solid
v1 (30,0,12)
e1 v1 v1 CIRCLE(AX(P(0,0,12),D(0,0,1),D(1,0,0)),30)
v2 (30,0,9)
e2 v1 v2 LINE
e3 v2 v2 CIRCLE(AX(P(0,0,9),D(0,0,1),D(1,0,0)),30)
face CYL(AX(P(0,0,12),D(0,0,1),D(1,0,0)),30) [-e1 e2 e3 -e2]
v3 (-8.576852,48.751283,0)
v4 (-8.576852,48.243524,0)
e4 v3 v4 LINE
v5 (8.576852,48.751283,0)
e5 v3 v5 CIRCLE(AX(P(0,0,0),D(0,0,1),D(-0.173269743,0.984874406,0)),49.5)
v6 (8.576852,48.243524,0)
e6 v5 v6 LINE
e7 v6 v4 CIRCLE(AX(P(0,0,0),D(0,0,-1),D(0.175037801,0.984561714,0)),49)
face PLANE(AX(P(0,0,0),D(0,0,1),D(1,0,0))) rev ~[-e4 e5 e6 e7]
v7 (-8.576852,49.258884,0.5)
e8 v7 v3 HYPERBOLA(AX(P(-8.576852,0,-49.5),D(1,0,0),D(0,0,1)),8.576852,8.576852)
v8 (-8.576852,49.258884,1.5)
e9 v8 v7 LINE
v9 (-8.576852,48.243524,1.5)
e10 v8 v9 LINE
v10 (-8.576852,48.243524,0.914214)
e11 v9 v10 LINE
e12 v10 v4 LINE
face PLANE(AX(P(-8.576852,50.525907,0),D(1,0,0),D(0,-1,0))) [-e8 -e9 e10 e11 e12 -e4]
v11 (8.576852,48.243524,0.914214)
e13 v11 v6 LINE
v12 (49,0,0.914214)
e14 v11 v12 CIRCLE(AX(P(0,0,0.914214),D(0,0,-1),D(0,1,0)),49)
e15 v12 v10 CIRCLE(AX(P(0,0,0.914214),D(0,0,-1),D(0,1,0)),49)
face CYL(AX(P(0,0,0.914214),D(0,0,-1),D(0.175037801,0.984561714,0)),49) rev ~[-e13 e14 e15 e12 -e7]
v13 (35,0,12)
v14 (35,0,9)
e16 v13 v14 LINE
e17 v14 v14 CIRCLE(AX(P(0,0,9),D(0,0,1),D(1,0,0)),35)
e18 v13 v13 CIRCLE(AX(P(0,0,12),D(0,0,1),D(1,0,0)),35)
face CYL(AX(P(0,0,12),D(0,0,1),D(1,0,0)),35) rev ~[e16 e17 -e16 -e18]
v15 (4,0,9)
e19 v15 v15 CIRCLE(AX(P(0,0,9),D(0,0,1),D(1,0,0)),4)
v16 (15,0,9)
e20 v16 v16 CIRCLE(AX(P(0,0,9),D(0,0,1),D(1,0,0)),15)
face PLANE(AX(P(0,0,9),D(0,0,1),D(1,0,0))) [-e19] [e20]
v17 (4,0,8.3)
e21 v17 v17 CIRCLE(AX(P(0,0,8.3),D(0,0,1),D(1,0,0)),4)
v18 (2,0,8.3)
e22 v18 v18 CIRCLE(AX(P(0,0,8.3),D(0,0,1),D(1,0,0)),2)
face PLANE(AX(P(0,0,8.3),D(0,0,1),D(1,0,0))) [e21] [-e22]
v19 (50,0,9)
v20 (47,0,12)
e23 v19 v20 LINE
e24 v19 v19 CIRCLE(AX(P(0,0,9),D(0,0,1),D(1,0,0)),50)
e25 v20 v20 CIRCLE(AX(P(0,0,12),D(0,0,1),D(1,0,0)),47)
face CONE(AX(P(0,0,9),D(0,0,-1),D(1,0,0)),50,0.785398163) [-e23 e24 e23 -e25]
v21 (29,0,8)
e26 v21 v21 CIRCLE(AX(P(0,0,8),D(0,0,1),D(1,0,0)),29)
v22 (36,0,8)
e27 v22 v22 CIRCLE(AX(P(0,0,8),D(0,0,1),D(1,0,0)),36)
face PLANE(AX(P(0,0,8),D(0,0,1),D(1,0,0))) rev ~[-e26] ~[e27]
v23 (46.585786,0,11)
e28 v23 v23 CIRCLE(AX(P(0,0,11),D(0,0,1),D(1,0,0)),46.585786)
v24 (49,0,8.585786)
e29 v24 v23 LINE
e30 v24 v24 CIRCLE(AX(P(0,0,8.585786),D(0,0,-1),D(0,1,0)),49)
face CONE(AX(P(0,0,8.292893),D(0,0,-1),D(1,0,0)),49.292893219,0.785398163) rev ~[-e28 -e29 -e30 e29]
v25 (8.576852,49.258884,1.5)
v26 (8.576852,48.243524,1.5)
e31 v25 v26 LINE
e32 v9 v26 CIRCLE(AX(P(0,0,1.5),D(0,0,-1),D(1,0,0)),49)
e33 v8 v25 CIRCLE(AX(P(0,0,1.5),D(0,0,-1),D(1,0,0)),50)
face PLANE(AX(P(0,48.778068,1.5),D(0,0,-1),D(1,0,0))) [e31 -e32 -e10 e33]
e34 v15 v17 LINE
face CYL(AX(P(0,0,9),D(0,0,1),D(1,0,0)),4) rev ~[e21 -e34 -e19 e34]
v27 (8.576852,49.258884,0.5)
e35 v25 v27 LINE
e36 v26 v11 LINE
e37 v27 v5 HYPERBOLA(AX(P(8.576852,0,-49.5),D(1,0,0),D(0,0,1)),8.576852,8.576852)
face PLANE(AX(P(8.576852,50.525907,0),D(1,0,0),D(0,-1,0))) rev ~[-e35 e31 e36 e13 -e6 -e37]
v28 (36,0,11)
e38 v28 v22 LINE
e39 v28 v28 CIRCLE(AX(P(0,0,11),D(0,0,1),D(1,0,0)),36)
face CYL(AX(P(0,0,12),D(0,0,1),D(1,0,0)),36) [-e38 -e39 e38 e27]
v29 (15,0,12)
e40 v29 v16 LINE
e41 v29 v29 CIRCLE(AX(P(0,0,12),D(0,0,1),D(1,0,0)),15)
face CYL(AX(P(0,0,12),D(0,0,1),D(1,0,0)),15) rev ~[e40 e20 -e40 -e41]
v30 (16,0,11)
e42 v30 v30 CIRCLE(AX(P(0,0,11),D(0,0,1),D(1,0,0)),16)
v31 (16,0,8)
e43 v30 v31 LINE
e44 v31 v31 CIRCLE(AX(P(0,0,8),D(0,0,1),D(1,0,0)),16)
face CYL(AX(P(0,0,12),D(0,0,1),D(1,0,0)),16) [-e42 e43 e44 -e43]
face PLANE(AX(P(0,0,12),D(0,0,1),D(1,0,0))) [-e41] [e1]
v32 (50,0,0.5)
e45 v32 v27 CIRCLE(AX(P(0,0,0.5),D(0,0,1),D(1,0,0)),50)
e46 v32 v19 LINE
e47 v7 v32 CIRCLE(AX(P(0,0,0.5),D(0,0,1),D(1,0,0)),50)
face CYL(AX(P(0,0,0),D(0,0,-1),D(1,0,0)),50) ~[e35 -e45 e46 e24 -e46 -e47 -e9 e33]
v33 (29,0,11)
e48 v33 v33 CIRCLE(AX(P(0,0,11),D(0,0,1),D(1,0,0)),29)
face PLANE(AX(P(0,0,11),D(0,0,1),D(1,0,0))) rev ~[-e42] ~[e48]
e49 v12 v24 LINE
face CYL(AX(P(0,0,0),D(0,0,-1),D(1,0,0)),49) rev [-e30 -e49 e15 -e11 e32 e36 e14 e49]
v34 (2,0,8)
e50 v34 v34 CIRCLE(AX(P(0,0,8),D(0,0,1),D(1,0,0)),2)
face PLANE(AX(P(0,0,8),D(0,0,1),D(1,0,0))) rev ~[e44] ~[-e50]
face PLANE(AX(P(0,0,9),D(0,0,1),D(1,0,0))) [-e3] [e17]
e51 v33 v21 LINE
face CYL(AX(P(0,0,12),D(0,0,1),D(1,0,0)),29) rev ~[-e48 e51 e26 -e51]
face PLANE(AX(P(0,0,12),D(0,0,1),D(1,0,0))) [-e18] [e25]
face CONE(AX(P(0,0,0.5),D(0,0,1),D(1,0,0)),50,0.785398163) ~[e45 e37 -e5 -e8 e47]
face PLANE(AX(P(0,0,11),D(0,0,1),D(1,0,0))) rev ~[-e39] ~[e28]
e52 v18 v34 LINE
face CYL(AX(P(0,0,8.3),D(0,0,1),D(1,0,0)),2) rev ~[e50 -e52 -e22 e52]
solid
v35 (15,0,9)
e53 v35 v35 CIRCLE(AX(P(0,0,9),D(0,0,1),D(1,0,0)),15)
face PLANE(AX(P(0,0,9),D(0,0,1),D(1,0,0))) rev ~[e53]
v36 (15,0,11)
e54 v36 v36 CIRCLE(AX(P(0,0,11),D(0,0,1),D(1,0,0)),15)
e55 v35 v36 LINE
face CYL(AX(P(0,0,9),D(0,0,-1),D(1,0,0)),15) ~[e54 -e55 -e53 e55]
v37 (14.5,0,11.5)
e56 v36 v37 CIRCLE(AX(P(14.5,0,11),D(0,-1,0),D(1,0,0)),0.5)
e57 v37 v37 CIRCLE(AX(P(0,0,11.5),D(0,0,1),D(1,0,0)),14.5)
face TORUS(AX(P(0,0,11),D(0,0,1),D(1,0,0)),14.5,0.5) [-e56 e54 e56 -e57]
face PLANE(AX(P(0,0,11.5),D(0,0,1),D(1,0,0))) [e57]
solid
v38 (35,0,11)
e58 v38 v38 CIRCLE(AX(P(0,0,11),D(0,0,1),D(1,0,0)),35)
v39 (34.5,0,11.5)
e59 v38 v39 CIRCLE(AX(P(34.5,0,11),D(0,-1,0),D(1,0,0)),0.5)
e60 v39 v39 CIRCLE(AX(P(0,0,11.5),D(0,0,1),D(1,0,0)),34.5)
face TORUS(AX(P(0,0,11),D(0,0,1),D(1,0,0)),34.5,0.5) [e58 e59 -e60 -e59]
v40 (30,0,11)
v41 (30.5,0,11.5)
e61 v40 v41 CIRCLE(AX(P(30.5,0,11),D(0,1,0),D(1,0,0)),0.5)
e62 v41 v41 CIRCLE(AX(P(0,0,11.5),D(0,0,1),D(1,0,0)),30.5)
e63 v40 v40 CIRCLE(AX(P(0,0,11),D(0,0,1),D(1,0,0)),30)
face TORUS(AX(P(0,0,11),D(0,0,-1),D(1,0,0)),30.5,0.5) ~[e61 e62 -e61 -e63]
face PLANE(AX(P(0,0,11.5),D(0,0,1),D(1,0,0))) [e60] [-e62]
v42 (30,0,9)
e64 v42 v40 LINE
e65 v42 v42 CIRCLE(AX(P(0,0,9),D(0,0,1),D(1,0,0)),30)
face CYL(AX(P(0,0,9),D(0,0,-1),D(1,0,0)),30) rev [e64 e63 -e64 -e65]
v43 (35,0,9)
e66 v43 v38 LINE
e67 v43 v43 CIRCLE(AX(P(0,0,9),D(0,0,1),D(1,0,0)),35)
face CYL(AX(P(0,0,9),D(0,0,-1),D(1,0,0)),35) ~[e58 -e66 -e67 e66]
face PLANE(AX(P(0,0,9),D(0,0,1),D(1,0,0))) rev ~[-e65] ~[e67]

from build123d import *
from build123d import SkipClean  # not in build123d's __all__

# Parameters (mm, degrees)
F0_R      = 50
F1_DEPTH  = 12
F2_SIZE   = 3
F3_SIZE   = 0.5
F4_R      = 35
F4_R_2    = 30
F4_R_3    = 15
F5_DEPTH  = 3
F6_R      = 35
F6_R_2    = 30
F7_DEPTH  = 2.5
F6_R_3    = 15
F8_R      = 0.5
F9_R      = 0.5
F10_T     = -1
F11_W     = 17.1537045389
F11_H     = 3.4956783056
F12_DEPTH = 1.5
F13_R     = 4
F14_DEPTH = 0.7
F15_R     = 2
F16_DEPTH = 8.301


with BuildPart() as f1:
    # F0 (on Top) → F1 (new body)
    with BuildSketch(Plane.XY):
        Circle(F0_R)
    extrude(amount=F1_DEPTH)

    # F2
    f2_edges = [f1.edges().sort_by_distance(p)[0] for p in [
        (-50, 0, 12),
    ]]
    chamfer(f2_edges, length=F2_SIZE)

    # F3
    f3_edges = [f1.edges().sort_by_distance(p)[0] for p in [
        (-50, 0, 0),
    ]]
    chamfer(f3_edges, length=F3_SIZE)

    # F4 (on face) → F5 (cut)
    with BuildSketch(Plane.XY.offset(12)):
        Circle(F4_R)
        Circle(F4_R_2, mode=Mode.SUBTRACT)
        Circle(F4_R_3)
    extrude(amount=-F5_DEPTH, mode=Mode.SUBTRACT)

    # F10
    f10_openings = [f1.faces().sort_by_distance(p)[0] for p in [
        (0, 0, 0),
    ]]
    offset(amount=F10_T, openings=f10_openings, kind=Kind.INTERSECTION)

    # F11 (on face) → F12 (cut)
    with BuildSketch(Plane(origin=(0, 0, 0), x_dir=(1, 0, 0), z_dir=(0, 0, -1))):
        with Locations((0, -48.7780682743)):
            Rectangle(F11_W, F11_H)
    extrude(amount=-F12_DEPTH, mode=Mode.SUBTRACT)

    # F13 (on face) → F14 (cut)
    with BuildSketch(Plane.XY.offset(9)):
        Circle(F13_R)
    extrude(amount=-F14_DEPTH, mode=Mode.SUBTRACT)

    # F15 (on face) → F16 (cut, through all)
    with BuildSketch(Plane.XY.offset(8.3)):
        Circle(F15_R)
    extrude(amount=-F16_DEPTH, mode=Mode.SUBTRACT)

    # F18 (on face) → F19 (revolve, cut)
    with BuildSketch(Plane(origin=(8.5768522695, 0, 0), x_dir=(0, -1, 0), z_dir=(-1, 0, 0))):
        Polygon((-47.3146960518, 0), (-48.2435239711, 0.9142135624), (-48.2435239711, 0), align=None)
    with SkipClean():  # cleaning this boolean's faces spoils the solid; the shape is the same uncleaned
        revolve(axis=Axis((0, 0, 0.4506437108), (0, 0, -1)), mode=Mode.SUBTRACT)


with BuildPart() as f7:
    # F6 (on face) → F7 (new body)
    with BuildSketch(Plane.XY.offset(9)):
        Circle(F6_R)
        Circle(F6_R_2, mode=Mode.SUBTRACT)
    extrude(amount=F7_DEPTH)

    # F8
    f8_edges = [f7.edges().sort_by_distance(p)[0] for p in [
        (-35, 0, 11.5),
        (-30, 0, 11.5),
    ]]
    fillet(f8_edges, radius=F8_R)


with BuildPart() as f7b:
    # F6 (on face) → F7, piece 2 (new body)
    with BuildSketch(Plane.XY.offset(9)):
        Circle(F6_R_3)
    extrude(amount=F7_DEPTH)

    # F9
    f9_edges = [f7b.edges().sort_by_distance(p)[0] for p in [
        (-15, 0, 11.5),
    ]]
    fillet(f9_edges, radius=F9_R)


solid = Compound([f1.part, f7.part, f7b.part])
